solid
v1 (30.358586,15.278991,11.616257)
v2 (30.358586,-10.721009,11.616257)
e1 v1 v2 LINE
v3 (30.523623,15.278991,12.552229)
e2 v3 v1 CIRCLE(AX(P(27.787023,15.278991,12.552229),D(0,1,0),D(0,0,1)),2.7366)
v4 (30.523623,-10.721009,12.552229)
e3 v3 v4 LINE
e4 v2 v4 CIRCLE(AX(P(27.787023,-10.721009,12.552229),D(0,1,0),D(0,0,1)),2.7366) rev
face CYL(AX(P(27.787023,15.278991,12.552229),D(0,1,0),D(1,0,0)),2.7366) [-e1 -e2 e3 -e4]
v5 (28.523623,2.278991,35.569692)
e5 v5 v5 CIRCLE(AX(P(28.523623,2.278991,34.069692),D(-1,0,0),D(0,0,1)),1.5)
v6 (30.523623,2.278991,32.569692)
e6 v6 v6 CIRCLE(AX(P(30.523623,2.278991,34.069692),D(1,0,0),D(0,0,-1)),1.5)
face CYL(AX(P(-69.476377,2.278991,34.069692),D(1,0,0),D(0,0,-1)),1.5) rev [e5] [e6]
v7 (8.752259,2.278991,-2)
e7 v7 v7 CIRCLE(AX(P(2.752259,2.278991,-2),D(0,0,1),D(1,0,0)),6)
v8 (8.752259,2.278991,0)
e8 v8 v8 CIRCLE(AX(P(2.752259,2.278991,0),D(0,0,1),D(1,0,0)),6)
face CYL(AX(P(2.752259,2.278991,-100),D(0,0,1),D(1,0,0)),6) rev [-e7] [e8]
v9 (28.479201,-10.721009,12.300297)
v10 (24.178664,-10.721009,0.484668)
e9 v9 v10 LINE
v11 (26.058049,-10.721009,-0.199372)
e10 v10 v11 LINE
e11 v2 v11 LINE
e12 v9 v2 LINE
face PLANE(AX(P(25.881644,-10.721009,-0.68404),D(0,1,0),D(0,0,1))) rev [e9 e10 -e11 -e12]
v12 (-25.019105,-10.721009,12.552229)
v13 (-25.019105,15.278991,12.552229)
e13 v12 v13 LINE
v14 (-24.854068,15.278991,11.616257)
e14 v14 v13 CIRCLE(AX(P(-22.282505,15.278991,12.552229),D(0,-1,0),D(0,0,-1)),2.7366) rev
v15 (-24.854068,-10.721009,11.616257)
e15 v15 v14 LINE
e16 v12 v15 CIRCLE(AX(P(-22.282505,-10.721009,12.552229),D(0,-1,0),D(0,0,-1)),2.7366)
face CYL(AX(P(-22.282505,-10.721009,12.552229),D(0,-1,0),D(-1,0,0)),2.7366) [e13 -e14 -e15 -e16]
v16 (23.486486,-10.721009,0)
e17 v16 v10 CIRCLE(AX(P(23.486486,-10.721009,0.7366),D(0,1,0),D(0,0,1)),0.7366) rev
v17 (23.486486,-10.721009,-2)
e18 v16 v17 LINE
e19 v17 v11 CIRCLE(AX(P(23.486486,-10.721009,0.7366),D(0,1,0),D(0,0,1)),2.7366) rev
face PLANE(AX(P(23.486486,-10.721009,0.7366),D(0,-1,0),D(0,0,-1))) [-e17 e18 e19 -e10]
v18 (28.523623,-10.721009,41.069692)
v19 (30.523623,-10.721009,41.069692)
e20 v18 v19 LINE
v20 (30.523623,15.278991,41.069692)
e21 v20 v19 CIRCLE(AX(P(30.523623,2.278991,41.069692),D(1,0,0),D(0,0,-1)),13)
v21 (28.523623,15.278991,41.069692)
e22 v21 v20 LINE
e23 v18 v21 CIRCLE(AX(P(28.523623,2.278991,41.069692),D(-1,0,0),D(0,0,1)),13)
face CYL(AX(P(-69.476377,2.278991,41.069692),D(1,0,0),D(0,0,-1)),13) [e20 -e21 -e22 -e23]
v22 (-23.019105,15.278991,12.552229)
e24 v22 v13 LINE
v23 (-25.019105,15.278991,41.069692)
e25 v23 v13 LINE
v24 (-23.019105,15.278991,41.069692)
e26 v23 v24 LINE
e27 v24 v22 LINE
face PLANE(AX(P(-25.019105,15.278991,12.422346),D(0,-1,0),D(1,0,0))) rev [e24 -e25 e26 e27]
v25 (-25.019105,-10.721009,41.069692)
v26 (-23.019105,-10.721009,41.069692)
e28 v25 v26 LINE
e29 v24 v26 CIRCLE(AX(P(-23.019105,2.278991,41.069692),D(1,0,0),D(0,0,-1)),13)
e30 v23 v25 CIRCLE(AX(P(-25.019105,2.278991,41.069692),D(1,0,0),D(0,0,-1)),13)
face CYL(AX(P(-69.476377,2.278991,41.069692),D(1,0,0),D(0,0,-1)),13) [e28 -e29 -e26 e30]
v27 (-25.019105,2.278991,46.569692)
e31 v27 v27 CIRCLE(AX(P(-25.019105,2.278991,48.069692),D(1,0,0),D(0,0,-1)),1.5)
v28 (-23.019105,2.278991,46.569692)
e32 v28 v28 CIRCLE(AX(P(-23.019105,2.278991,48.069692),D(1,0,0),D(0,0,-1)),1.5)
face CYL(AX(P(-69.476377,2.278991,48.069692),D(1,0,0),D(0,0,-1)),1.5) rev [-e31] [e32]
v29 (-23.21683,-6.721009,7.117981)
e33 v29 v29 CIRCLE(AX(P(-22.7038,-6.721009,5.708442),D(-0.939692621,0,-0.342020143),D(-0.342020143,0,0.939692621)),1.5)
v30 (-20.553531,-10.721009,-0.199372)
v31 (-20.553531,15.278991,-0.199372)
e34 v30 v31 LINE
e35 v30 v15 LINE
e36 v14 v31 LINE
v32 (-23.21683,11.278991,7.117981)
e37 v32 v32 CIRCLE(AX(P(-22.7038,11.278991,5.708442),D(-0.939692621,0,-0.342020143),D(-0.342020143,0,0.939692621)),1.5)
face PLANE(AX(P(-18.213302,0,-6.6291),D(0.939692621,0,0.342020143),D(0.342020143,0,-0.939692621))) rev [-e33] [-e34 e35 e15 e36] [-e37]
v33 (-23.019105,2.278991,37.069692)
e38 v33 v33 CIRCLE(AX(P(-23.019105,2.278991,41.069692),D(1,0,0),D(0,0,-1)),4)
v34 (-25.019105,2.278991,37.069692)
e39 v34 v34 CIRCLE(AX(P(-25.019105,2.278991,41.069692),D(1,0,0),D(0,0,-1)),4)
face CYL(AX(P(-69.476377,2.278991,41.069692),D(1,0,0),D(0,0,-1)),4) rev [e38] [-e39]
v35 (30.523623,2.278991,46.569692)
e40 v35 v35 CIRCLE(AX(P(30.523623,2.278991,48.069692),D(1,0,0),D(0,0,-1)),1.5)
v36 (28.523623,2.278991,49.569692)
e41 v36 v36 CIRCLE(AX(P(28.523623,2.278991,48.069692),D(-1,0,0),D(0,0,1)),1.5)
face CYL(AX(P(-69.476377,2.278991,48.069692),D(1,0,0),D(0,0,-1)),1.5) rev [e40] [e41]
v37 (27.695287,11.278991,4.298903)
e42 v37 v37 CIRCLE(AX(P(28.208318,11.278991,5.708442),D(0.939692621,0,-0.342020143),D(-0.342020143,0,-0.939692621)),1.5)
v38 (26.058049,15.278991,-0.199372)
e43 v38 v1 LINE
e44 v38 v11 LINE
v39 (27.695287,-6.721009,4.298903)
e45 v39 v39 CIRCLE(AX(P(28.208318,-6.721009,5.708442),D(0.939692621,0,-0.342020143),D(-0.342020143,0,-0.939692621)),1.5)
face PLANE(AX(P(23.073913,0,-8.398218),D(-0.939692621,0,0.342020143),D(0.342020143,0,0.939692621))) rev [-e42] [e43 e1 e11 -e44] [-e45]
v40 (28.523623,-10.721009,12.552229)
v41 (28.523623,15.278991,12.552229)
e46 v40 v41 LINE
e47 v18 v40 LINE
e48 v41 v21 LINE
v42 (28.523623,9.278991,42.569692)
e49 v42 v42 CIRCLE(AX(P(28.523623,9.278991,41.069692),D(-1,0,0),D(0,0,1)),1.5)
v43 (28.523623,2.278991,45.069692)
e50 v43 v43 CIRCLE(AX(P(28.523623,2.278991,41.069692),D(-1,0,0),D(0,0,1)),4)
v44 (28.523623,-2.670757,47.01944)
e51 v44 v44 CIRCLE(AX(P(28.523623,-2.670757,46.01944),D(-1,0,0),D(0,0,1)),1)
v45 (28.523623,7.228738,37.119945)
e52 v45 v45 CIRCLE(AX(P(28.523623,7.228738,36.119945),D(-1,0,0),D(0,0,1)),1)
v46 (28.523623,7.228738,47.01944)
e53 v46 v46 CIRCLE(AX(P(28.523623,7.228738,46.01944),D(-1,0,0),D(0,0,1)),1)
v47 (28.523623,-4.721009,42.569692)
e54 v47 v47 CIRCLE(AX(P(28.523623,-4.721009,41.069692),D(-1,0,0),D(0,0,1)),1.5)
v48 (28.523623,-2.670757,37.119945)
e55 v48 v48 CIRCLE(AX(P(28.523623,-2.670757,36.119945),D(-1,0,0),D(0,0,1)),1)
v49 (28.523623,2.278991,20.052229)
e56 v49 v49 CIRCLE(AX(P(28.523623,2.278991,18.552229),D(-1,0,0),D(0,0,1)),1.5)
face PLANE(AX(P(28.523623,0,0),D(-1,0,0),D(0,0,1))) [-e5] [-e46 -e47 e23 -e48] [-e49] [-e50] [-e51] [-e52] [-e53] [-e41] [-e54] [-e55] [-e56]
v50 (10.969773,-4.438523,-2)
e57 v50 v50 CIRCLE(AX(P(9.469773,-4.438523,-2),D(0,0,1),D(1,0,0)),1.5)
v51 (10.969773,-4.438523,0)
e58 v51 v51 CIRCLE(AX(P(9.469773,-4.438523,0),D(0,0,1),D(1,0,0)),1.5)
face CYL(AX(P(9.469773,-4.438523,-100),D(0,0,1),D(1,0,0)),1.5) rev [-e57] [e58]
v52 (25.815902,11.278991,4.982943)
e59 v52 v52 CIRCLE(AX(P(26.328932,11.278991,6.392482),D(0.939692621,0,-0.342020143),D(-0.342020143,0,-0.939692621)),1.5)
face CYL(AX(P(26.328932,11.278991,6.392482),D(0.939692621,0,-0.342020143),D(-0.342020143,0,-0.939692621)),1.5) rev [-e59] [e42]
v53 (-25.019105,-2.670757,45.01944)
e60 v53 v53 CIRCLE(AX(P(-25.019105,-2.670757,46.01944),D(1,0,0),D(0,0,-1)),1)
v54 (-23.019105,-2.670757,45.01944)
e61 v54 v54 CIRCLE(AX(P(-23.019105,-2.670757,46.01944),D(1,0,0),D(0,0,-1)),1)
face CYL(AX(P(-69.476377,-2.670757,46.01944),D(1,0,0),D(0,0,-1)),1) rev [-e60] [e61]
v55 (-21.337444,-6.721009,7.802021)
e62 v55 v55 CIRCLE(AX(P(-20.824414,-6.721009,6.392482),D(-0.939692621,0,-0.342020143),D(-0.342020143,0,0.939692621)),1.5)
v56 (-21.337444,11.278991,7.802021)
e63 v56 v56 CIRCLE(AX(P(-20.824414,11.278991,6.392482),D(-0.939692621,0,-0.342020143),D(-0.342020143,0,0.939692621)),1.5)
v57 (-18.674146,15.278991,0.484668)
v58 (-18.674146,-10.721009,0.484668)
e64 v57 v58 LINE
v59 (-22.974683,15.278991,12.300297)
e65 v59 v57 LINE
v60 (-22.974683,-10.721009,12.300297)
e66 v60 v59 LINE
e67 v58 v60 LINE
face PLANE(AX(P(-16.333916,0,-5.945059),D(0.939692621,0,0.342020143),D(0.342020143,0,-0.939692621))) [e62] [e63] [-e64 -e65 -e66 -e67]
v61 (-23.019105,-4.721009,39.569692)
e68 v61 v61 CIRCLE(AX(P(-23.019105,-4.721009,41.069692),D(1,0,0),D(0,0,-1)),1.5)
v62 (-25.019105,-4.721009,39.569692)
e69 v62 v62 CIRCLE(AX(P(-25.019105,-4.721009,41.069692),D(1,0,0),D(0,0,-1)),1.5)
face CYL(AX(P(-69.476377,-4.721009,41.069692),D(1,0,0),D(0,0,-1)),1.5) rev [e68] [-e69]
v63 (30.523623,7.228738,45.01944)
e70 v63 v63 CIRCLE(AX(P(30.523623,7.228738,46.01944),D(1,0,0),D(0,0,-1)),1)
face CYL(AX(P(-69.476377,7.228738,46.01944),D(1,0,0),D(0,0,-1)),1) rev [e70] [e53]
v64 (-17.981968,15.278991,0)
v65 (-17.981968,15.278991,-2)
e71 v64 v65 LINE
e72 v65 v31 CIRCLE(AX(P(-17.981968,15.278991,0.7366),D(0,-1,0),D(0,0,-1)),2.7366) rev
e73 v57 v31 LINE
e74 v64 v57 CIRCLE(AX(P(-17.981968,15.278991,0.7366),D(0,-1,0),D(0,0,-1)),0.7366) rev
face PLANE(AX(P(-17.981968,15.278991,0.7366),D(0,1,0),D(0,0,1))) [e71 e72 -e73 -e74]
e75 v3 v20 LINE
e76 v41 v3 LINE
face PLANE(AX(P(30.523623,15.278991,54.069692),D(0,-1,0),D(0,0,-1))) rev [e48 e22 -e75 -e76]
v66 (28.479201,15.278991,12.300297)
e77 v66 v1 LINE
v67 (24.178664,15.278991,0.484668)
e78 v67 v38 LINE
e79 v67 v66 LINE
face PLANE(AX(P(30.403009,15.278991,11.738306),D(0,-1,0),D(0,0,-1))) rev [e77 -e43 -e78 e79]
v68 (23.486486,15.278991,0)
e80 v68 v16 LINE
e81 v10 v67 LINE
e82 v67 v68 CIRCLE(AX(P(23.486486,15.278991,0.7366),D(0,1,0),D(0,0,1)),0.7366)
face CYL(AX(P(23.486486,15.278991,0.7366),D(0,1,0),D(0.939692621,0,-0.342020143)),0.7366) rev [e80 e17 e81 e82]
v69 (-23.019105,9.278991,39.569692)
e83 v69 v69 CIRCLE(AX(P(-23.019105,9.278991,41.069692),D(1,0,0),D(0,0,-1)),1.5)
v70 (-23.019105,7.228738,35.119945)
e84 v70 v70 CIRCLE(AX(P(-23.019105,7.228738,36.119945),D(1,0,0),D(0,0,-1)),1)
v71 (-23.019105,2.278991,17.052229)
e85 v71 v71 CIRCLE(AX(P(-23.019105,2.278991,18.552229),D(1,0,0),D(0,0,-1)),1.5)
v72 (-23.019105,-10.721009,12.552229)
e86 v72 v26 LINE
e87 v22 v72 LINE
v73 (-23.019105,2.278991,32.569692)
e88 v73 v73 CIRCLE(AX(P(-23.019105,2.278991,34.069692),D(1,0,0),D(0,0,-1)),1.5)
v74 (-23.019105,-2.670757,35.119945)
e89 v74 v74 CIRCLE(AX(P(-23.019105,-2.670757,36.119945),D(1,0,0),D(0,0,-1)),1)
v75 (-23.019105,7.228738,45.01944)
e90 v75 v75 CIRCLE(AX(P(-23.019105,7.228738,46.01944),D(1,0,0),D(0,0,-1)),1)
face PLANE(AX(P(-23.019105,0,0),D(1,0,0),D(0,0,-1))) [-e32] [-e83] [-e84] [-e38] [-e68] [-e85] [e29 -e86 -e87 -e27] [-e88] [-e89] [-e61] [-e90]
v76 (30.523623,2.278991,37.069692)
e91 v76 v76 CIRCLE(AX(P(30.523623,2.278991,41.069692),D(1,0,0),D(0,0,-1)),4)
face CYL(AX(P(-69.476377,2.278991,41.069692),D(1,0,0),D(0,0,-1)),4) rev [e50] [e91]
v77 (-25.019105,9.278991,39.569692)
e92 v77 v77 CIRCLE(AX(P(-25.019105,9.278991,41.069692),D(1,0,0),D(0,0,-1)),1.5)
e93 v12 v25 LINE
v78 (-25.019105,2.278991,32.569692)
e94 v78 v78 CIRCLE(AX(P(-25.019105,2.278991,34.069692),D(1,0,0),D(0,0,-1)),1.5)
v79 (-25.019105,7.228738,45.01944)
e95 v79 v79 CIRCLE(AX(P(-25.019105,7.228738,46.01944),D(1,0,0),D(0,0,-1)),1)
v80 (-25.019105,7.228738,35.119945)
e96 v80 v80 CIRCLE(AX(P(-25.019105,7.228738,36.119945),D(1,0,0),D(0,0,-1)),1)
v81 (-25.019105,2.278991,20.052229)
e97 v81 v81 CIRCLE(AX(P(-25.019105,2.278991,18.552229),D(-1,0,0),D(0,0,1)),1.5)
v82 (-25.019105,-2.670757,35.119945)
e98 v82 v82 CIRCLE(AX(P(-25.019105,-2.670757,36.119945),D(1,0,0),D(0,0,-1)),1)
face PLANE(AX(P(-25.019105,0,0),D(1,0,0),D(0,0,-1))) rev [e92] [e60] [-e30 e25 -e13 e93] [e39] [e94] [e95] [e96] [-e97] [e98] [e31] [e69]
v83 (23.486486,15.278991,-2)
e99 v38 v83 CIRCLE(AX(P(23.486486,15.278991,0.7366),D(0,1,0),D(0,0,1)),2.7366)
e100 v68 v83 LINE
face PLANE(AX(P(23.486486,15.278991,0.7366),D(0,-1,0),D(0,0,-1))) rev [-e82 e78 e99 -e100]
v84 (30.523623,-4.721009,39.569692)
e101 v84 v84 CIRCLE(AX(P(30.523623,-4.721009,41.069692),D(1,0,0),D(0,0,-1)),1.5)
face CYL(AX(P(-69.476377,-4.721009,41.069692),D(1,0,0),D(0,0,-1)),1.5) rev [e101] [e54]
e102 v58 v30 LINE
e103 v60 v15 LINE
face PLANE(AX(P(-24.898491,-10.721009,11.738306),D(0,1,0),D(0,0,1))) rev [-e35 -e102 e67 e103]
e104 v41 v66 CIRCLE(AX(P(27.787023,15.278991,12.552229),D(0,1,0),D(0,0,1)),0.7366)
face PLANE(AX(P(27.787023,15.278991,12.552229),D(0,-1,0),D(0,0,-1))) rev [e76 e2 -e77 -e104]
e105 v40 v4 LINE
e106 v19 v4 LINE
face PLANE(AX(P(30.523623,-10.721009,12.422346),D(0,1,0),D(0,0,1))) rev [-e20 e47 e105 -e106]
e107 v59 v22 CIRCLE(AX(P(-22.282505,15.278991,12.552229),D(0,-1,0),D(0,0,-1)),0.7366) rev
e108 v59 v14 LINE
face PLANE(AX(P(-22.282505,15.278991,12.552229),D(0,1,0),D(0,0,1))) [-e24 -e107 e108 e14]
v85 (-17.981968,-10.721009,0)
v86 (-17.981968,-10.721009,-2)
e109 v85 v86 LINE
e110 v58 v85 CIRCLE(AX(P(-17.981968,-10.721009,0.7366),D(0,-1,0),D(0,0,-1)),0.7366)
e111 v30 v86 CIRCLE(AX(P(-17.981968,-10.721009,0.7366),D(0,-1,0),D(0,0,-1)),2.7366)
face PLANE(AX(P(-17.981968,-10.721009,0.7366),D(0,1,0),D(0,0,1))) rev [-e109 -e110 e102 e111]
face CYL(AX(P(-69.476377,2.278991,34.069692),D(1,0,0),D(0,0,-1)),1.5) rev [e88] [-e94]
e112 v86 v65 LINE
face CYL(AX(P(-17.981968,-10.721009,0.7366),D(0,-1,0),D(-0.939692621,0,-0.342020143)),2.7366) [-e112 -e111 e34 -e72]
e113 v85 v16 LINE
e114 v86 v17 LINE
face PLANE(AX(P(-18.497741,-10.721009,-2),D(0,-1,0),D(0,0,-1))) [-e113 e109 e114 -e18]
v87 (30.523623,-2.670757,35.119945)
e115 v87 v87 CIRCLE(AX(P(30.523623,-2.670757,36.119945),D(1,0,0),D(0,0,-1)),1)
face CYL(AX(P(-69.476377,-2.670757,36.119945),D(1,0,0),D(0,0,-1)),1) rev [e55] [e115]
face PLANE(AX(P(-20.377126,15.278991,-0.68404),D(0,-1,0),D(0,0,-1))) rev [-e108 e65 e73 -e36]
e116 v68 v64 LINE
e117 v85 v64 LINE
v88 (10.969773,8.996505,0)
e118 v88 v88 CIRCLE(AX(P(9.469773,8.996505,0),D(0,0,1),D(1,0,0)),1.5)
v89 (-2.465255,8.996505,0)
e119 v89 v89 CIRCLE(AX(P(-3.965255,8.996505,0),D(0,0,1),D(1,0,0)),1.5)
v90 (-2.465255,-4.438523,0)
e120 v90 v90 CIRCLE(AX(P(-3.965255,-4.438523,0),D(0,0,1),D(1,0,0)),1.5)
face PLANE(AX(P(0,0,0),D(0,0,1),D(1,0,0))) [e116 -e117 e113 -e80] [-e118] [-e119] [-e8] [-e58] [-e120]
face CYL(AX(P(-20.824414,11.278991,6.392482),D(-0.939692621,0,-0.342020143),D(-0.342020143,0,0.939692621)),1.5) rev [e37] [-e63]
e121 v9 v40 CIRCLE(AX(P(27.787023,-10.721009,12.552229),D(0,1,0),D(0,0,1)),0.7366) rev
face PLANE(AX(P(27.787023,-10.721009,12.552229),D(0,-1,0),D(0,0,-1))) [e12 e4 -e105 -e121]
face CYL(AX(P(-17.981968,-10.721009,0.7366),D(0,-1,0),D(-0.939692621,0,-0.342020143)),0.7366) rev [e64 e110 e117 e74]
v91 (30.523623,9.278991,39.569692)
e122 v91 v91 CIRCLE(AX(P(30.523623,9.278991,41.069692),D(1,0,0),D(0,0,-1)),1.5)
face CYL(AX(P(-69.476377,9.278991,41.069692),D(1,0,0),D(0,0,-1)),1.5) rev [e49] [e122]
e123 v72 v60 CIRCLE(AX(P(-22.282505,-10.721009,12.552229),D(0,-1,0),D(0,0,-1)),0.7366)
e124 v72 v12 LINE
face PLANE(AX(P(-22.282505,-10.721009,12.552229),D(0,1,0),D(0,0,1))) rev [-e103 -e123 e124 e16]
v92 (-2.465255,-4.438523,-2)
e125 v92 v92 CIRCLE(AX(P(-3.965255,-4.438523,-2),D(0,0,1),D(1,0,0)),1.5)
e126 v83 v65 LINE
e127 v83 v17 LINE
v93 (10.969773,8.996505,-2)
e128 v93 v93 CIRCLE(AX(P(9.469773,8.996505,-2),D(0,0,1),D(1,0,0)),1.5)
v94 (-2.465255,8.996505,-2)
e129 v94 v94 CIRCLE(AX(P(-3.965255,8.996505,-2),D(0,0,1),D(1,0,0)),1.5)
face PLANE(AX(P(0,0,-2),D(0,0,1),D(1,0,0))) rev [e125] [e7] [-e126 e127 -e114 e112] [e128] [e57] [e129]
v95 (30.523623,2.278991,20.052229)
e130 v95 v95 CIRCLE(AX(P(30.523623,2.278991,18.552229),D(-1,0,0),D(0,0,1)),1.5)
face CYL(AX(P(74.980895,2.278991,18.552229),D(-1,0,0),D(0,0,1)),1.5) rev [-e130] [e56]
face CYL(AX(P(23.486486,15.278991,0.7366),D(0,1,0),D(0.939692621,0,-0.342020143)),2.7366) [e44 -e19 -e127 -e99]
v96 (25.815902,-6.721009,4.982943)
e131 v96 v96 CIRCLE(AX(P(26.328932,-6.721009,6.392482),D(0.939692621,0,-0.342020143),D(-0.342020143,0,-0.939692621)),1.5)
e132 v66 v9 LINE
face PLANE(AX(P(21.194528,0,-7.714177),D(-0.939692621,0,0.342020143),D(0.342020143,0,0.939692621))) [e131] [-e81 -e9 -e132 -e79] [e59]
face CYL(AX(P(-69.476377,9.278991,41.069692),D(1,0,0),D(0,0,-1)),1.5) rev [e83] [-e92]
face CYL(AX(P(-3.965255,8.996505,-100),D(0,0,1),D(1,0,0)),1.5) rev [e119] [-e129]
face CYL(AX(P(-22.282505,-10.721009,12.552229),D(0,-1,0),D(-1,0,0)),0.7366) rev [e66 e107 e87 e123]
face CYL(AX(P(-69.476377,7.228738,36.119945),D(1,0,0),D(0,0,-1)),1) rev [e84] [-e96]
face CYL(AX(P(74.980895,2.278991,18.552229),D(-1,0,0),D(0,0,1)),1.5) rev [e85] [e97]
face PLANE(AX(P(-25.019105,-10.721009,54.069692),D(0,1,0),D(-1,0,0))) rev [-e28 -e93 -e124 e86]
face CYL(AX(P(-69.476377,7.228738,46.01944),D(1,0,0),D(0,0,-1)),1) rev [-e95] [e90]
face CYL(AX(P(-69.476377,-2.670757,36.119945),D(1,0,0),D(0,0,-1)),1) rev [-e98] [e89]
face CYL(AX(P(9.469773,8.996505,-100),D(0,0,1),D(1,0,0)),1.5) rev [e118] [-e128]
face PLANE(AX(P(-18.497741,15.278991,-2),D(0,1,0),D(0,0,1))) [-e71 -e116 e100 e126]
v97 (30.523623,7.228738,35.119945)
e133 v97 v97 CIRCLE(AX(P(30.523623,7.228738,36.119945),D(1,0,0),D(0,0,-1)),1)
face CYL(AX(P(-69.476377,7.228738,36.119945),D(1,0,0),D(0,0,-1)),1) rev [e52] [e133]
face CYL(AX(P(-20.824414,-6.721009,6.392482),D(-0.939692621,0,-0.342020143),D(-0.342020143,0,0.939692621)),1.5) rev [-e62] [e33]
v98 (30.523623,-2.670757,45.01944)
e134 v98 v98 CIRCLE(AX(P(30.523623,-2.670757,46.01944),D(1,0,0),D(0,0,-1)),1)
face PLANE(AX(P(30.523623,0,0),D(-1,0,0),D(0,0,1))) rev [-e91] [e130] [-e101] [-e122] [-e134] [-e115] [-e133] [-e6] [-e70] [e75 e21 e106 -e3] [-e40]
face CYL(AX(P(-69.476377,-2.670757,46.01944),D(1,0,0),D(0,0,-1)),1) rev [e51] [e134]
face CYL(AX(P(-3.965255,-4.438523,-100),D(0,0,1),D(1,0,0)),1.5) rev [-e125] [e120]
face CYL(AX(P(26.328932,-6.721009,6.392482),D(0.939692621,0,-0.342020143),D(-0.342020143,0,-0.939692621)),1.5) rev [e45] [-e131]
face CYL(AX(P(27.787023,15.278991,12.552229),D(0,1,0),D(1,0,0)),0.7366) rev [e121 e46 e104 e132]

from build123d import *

# Parameters (mm, degrees)
SKETCH_1_W                       = 42.5
SKETCH_1_H                       = 26
SM_BASE_FLANGE_1_DEPTH           = 2
SM_EDGE_FLANGE_1_STRIP_CUT_DEPTH = 26
SM_EDGE_FLANGE_1_DEPTH           = 26
SM_EDGE_FLANGE_2_STRIP_CUT_DEPTH = 26
SM_EDGE_FLANGE_2_DEPTH           = 26
SM_EDGE_FLANGE_3_STRIP_CUT_DEPTH = 26
SM_EDGE_FLANGE_3_DEPTH           = 26
SM_EDGE_FLANGE_4_STRIP_CUT_DEPTH = 26
SM_EDGE_FLANGE_4_DEPTH           = 26
CUT_EXTRUDE_1_DEPTH              = 100
SKETCH_19_R                      = 1
SKETCH_19_R_2                    = 1.5
SKETCH_19_R_3                    = 4
CUT_EXTRUDE_2_DEPTH              = 100
SKETCH_20_R                      = 6
SKETCH_20_R_2                    = 1.5
CUT_EXTRUDE_3_DEPTH              = 100
SKETCH_21_R                      = 1.5
CUT_EXTRUDE_4_DEPTH              = 2
SKETCH_22_R                      = 1.5
CUT_EXTRUDE_5_DEPTH              = 2
SKETCH_23_R                      = 1.5
CUT_EXTRUDE_6_DEPTH              = 100


# Sheet-metal steps are written as plain solids
with BuildPart() as part:
    # Sketch 1 → 基体-法兰1 (new body)
    with BuildSketch(Plane.XY):
        with Locations((2.752259036, 2.278990964)):
            Rectangle(SKETCH_1_W, SKETCH_1_H)
    extrude(amount=-SM_BASE_FLANGE_1_DEPTH)

    # 边线-法兰1 strip (across the edge) → 边线-法兰1 strip cut (cut)
    with BuildSketch(Plane(origin=(24.002259036, -10.721009036, 0), x_dir=(-0.939692620785907, 0, 0.3420201433256726), z_dir=(0, 1, 0))):
        Polygon((-9.101268459, 1.184235268), (-0.199372324, -2.055789953), (0.484667962, -0.176404712), (-8.417228173, 3.06362051), align=None)
    extrude(amount=SM_EDGE_FLANGE_1_STRIP_CUT_DEPTH, mode=Mode.SUBTRACT)

    # 边线-法兰1 section (across the edge) → 边线-法兰1 (add)
    with BuildSketch(Plane(origin=(24.002259036, -10.721009036, 0), x_dir=(-0.939692620785907, 0, 0.3420201433256726), z_dir=(0, 1, 0))):
        with BuildLine():
            Line((-2, 0.515772873), (-2, 13.219584924))
            Line((-2, 13.219584924), (0, 13.219584924))
            Line((0, 13.219584924), (0, 0.515772873))
            ThreePointArc((0, 0.515772873), (0.133212604, 0.09327647), (0.484667962, -0.176404712))
            Line((0.484667962, -0.176404712), (-0.199372324, -2.055789953))
            ThreePointArc((-0.199372324, -2.055789953), (-1.505091484, -1.053876403), (-2, 0.515772873))
        make_face()
    extrude(amount=SM_EDGE_FLANGE_1_DEPTH)

    # 边线-法兰2 strip (across the edge) → 边线-法兰2 strip cut (cut)
    with BuildSketch(Plane(origin=(28.523623366, -10.721009036, 12.422346403), x_dir=(-1, 0, 0), z_dir=(0, 1, 0))):
        Polygon((-5.074988048, 8.095806265), (-1.834962826, -0.80608987), (0.044422416, -0.122049584), (-3.195602806, 8.779846552), align=None)
    extrude(amount=SM_EDGE_FLANGE_2_STRIP_CUT_DEPTH, mode=Mode.SUBTRACT)

    # 边线-法兰2 section (across the edge) → 边线-法兰2 (add)
    with BuildSketch(Plane(origin=(28.523623366, -10.721009036, 12.422346403), x_dir=(-1, 0, 0), z_dir=(0, 1, 0))):
        with BuildLine():
            Line((-2, 0.129882454), (-2, 41.647346039))
            Line((-2, 41.647346039), (0, 41.647346039))
            Line((0, 41.647346039), (0, 0.129882454))
            ThreePointArc((0, 0.129882454), (0.011190609, 0.001973206), (0.044422416, -0.122049584))
            Line((0.044422416, -0.122049584), (-1.834962826, -0.80608987))
            ThreePointArc((-1.834962826, -0.80608987), (-1.958424897, -0.345323149), (-2, 0.129882454))
        make_face()
    extrude(amount=SM_EDGE_FLANGE_2_DEPTH)

    # 边线-法兰3 strip (across the edge) → 边线-法兰3 strip cut (cut)
    with BuildSketch(Plane(origin=(-18.497740964, 15.278990964, 0), x_dir=(0.939692620785907, 0, 0.3420201433256726), z_dir=(0, -1, 0))):
        Polygon((-9.101268459, 1.184235268), (-0.199372324, -2.055789953), (0.484667962, -0.176404712), (-8.417228173, 3.06362051), align=None)
    extrude(amount=SM_EDGE_FLANGE_3_STRIP_CUT_DEPTH, mode=Mode.SUBTRACT)

    # 边线-法兰3 section (across the edge) → 边线-法兰3 (add)
    with BuildSketch(Plane(origin=(-18.497740964, 15.278990964, 0), x_dir=(0.939692620785907, 0, 0.3420201433256726), z_dir=(0, -1, 0))):
        with BuildLine():
            Line((-2, 0.515772873), (-2, 13.219584924))
            Line((-2, 13.219584924), (0, 13.219584924))
            Line((0, 13.219584924), (0, 0.515772873))
            ThreePointArc((0, 0.515772873), (0.133212604, 0.09327647), (0.484667962, -0.176404712))
            Line((0.484667962, -0.176404712), (-0.199372324, -2.055789953))
            ThreePointArc((-0.199372324, -2.055789953), (-1.505091484, -1.053876403), (-2, 0.515772873))
        make_face()
    extrude(amount=SM_EDGE_FLANGE_3_DEPTH)

    # 边线-法兰4 strip (across the edge) → 边线-法兰4 strip cut (cut)
    with BuildSketch(Plane(origin=(-23.019105294, 15.278990964, 12.422346403), x_dir=(1, 0, 0), z_dir=(0, -1, 0))):
        Polygon((-5.074988048, 8.095806265), (-1.834962826, -0.80608987), (0.044422416, -0.122049584), (-3.195602806, 8.779846552), align=None)
    extrude(amount=SM_EDGE_FLANGE_4_STRIP_CUT_DEPTH, mode=Mode.SUBTRACT)

    # 边线-法兰4 section (across the edge) → 边线-法兰4 (add)
    with BuildSketch(Plane(origin=(-23.019105294, 15.278990964, 12.422346403), x_dir=(1, 0, 0), z_dir=(0, -1, 0))):
        with BuildLine():
            Line((-2, 0.129882454), (-2, 41.647346039))
            Line((-2, 41.647346039), (0, 41.647346039))
            Line((0, 41.647346039), (0, 0.129882454))
            ThreePointArc((0, 0.129882454), (0.011190609, 0.001973206), (0.044422416, -0.122049584))
            Line((0.044422416, -0.122049584), (-1.834962826, -0.80608987))
            ThreePointArc((-1.834962826, -0.80608987), (-1.958424897, -0.345323149), (-2, 0.129882454))
        make_face()
    extrude(amount=SM_EDGE_FLANGE_4_DEPTH)

    # 草图18 → 切除-拉伸1 (cut)
    with BuildSketch(Plane(origin=(30.523623366, 0, 0), x_dir=(0, 0, -1), z_dir=(1, 0, 0))):
        with BuildLine():
            Line((-41.069692441, 15.278990964), (-54.069692441, 15.278990964))
            Line((-54.069692441, 15.278990964), (-54.069692441, 2.278990964))
            ThreePointArc((-54.069692441, 2.278990964), (-50.262080597, 11.471379119), (-41.069692441, 15.278990964))
        make_face()
        with BuildLine():
            ThreePointArc((-41.069692441, -10.721009036), (-50.262080597, -6.913397192), (-54.069692441, 2.278990964))
            Line((-54.069692441, 2.278990964), (-54.069692441, -10.721009036))
            Line((-54.069692441, -10.721009036), (-41.069692441, -10.721009036))
        make_face()
    extrude(amount=-CUT_EXTRUDE_1_DEPTH, mode=Mode.SUBTRACT)

    # 草图19 → 切除-拉伸2 (cut)
    with BuildSketch(Plane(origin=(30.523623366, 0, 0), x_dir=(0, 0, -1), z_dir=(1, 0, 0))):
        with Locations((-36.119944973, 7.228738432)):
            Circle(SKETCH_19_R)
        with Locations((-34.069692441, 2.278990964)):
            Circle(SKETCH_19_R_2)
        with Locations((-36.119944973, -2.670756504)):
            Circle(SKETCH_19_R)
        with Locations((-41.069692441, -4.721009036)):
            Circle(SKETCH_19_R_2)
        with Locations((-46.019439909, -2.670756504)):
            Circle(SKETCH_19_R)
        with Locations((-48.069692441, 2.278990964)):
            Circle(SKETCH_19_R_2)
        with Locations((-46.019439909, 7.228738432)):
            Circle(SKETCH_19_R)
        with Locations((-41.069692441, 9.278990964)):
            Circle(SKETCH_19_R_2)
        with Locations((-41.069692441, 2.278990964)):
            Circle(SKETCH_19_R_3)
    extrude(amount=-CUT_EXTRUDE_2_DEPTH, mode=Mode.SUBTRACT)

    # 草图20 → 切除-拉伸3 (cut)
    with BuildSketch(Plane.XY):
        with Locations((2.752259036, 2.278990964)):
            Circle(SKETCH_20_R)
        with Locations((9.469773457, 8.996505385)):
            Circle(SKETCH_20_R_2)
        with Locations((-3.965255385, 8.996505385)):
            Circle(SKETCH_20_R_2)
        with Locations((-3.965255385, -4.438523457)):
            Circle(SKETCH_20_R_2)
        with Locations((9.469773457, -4.438523457)):
            Circle(SKETCH_20_R_2)
    extrude(amount=-CUT_EXTRUDE_3_DEPTH, mode=Mode.SUBTRACT)

    # 草图21 → 切除-拉伸4 (cut)
    with BuildSketch(Plane(origin=(23.073913338, 0, -8.398217643), x_dir=(-0.3420201433256726, 0, -0.9396926207859071), z_dir=(0.9396926207859071, 0, -0.3420201433256726))):
        with Locations((-15.011993747, 11.278990964)):
            Circle(SKETCH_21_R)
        with Locations((-15.011993747, -6.721009036)):
            Circle(SKETCH_21_R)
    extrude(amount=-CUT_EXTRUDE_4_DEPTH, mode=Mode.SUBTRACT)

    # 草图22 → 切除-拉伸5 (cut)
    with BuildSketch(Plane(origin=(-18.213301561, 0, -6.629099636), x_dir=(-0.3420201433256726, 0, 0.9396926207859071), z_dir=(-0.9396926207859071, 0, -0.3420201433256726))):
        with Locations((13.129337687, 11.278990964)):
            Circle(SKETCH_22_R)
        with Locations((13.129337687, -6.721009036)):
            Circle(SKETCH_22_R)
    extrude(amount=-CUT_EXTRUDE_5_DEPTH, mode=Mode.SUBTRACT)

    # 草图23 → 切除-拉伸6 (cut)
    with BuildSketch(Plane.ZY.offset(25.019105294)):
        with Locations((18.552228857, 2.278990964)):
            Circle(SKETCH_23_R)
    extrude(amount=-CUT_EXTRUDE_6_DEPTH, mode=Mode.SUBTRACT)


solid = part.part
